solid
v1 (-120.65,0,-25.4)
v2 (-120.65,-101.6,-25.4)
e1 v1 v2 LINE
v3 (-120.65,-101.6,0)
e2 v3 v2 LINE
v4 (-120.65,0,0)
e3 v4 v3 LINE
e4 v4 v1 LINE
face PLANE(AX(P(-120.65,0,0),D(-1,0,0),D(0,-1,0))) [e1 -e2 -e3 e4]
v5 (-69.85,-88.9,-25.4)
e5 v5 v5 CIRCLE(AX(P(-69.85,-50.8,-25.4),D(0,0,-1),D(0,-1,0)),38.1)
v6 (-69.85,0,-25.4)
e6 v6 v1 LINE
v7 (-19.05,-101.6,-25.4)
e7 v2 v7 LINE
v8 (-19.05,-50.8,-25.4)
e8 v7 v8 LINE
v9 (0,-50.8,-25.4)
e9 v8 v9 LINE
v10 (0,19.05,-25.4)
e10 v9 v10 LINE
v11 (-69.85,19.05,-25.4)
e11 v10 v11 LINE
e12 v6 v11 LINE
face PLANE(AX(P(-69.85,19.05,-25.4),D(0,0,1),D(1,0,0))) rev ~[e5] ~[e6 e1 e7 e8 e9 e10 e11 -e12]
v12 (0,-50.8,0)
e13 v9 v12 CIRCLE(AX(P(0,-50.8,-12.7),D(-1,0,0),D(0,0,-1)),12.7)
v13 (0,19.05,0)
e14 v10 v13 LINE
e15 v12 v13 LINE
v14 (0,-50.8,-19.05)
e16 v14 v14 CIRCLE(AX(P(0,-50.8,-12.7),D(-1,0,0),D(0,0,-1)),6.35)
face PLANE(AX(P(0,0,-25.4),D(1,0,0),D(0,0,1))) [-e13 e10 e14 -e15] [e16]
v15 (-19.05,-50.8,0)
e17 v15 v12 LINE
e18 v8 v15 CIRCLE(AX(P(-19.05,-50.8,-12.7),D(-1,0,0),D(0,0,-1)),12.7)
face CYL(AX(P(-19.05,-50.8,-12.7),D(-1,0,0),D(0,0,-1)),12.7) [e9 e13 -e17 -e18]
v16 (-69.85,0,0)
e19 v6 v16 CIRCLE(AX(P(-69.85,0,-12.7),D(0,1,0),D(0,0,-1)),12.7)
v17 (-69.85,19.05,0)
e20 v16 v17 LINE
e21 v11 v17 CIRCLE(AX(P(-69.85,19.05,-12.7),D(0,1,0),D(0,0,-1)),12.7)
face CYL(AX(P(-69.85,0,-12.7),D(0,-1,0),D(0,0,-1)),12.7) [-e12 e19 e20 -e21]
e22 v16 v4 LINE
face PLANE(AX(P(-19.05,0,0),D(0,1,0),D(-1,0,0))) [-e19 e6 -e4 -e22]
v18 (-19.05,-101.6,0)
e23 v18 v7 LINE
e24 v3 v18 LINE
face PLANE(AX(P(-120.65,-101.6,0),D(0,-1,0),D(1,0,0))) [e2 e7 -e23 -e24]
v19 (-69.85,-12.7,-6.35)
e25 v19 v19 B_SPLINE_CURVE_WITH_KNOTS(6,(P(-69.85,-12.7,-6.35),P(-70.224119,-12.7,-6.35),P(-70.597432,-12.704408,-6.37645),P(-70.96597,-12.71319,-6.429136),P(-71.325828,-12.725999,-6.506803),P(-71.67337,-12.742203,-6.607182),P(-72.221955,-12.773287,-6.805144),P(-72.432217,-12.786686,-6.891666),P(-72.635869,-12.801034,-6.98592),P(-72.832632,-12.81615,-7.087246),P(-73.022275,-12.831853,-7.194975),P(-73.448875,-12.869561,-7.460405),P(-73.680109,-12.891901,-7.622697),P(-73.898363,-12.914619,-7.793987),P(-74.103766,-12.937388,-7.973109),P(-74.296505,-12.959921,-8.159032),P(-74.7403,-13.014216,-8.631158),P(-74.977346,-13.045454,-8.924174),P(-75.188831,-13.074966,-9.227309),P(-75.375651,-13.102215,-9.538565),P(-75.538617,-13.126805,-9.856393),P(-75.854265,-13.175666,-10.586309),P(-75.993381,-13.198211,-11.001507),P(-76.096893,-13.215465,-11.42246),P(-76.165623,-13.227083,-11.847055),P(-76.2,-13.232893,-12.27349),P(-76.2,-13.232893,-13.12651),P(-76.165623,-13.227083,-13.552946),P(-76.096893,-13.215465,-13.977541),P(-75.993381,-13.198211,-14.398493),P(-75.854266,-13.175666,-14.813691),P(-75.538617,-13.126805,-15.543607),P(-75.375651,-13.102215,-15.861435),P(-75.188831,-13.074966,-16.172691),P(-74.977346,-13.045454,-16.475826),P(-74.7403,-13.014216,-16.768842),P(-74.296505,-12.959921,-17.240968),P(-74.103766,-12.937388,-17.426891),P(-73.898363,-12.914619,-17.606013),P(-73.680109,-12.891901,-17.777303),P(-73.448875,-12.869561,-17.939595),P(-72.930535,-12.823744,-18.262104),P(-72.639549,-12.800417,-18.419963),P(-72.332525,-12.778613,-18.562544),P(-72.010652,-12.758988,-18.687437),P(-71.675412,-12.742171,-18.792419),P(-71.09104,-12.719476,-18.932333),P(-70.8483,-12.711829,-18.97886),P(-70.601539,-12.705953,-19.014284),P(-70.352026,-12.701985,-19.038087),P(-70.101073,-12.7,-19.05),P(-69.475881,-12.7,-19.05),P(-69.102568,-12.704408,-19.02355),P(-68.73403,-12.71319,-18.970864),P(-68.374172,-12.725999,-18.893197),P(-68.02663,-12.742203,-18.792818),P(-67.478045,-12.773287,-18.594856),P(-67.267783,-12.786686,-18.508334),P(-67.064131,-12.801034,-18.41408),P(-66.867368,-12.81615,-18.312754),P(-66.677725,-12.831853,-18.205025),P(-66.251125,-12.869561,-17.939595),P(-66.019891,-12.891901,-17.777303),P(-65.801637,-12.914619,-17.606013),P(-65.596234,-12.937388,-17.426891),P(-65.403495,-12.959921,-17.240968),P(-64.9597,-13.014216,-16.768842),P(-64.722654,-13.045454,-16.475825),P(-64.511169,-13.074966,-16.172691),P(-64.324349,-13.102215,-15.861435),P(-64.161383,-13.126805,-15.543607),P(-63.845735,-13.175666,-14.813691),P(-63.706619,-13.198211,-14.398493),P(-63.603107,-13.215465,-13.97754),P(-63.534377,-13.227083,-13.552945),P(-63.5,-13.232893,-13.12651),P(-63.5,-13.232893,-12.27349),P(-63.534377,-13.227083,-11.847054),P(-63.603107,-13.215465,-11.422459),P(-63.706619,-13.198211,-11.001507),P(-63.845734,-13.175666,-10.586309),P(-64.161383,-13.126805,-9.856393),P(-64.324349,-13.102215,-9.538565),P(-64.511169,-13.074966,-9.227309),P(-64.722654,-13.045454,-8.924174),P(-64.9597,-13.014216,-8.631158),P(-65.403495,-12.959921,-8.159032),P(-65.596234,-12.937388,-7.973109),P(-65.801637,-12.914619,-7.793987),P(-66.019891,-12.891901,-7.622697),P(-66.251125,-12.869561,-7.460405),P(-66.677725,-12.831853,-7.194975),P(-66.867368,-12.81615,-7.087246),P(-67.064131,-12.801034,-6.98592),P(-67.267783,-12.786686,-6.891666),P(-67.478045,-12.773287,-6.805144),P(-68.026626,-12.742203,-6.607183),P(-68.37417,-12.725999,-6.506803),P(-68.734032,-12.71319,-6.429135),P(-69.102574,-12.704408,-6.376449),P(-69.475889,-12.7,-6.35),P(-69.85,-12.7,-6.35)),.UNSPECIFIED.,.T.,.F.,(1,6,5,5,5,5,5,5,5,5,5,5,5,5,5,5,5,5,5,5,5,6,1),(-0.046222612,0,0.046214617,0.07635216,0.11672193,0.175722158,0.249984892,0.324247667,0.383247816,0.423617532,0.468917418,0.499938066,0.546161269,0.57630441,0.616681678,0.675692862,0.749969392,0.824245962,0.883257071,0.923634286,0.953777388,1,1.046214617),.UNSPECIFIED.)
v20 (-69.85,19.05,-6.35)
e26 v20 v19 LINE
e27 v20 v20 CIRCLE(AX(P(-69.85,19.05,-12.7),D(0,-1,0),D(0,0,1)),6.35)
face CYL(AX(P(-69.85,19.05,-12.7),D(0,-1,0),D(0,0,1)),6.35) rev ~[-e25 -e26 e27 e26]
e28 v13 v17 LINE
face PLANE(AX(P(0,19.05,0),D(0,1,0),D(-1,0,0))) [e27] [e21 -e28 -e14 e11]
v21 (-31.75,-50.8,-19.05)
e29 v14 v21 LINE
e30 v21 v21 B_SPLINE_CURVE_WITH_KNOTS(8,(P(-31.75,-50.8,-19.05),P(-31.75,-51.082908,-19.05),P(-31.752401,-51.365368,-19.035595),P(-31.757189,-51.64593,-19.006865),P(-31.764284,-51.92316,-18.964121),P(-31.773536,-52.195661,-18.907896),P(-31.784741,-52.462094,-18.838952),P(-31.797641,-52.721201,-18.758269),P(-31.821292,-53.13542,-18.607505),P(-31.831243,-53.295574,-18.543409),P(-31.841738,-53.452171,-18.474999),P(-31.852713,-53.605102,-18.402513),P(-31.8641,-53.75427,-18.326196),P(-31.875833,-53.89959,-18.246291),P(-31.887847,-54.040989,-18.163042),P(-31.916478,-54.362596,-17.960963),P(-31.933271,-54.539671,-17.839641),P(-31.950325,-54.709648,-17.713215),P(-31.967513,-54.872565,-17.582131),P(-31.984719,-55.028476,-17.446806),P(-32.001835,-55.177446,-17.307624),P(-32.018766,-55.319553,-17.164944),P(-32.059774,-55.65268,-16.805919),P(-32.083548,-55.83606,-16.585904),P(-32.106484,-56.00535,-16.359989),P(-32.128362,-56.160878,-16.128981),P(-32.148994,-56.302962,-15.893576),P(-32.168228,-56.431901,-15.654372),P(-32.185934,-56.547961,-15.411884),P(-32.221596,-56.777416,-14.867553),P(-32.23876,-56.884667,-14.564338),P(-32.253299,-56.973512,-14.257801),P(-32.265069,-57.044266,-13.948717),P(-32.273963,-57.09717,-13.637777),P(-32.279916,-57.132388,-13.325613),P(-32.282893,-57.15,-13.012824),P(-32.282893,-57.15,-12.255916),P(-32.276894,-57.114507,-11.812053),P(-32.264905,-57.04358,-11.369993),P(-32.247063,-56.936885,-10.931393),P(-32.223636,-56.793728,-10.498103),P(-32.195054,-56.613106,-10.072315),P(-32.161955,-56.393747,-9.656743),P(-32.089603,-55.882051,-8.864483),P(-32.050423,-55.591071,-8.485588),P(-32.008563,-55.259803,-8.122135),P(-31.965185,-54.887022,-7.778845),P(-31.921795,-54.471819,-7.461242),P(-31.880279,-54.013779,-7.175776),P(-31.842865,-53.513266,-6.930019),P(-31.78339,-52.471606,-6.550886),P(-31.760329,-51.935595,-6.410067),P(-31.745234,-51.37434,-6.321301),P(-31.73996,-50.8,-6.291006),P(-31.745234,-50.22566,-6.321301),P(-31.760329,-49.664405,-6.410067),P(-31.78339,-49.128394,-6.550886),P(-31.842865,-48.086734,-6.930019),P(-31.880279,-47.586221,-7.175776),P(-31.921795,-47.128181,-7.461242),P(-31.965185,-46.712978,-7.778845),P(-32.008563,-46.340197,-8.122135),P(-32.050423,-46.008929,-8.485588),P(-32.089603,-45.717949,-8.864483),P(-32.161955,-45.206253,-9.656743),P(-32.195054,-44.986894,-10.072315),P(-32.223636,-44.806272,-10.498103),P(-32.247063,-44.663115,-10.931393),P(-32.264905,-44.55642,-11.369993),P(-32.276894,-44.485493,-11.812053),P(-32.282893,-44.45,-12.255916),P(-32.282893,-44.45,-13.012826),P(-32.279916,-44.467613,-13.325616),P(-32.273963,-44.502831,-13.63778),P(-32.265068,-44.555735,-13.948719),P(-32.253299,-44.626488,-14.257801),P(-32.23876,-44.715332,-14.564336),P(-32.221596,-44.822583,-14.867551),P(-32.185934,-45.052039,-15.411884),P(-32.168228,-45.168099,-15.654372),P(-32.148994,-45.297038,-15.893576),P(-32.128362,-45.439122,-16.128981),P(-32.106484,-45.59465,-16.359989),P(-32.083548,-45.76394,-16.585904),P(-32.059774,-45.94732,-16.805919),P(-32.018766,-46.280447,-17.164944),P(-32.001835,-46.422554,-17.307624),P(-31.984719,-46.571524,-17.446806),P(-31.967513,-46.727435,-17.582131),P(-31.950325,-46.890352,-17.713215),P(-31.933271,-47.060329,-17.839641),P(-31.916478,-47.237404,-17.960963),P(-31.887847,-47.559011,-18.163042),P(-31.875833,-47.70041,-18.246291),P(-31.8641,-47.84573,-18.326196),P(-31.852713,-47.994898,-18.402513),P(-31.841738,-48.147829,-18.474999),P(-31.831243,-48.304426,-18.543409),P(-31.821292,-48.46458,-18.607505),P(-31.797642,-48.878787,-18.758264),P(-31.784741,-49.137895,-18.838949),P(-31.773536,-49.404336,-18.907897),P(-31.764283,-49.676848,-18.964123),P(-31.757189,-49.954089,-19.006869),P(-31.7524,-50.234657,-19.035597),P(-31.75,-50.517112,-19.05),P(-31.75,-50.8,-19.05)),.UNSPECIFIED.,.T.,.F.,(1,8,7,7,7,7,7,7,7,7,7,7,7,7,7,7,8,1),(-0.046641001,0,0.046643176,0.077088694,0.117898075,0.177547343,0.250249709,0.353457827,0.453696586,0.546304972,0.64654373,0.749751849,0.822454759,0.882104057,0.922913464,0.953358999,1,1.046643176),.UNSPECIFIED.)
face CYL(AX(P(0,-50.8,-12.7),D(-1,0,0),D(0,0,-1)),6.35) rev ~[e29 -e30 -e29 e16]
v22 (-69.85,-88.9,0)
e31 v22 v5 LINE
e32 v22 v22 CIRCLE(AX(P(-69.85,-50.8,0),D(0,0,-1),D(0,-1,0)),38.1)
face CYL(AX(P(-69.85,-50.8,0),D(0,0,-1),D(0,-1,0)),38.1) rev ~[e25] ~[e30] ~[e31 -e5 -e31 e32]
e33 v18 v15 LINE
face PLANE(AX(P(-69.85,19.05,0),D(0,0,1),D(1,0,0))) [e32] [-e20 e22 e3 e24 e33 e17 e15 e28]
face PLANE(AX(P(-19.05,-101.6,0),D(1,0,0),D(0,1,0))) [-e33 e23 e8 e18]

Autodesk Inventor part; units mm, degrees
ref_plane "YZ Plane" through (0, 0, 0) normal (1, 0, 0) x (0, 1, 0)
ref_plane "XZ Plane" through (0, 0, 0) normal (0, 1, 0) x (-1, 0, 0)
ref_plane "XY Plane" through (0, 0, 0) normal (0, 0, 1) x (1, 0, 0)
sketch "Sketch2" plane through (0, 0, 0) normal (0, 1, 0) x (-1, 0, 0)
  line L0 (0, 0) -> (69.85, 0)
  line L1 (69.85, 0) -> (69.85, -25.4) construction
  line L2 (69.85, -25.4) -> (0, -25.4)
  line L3 (0, -25.4) -> (0, 0)
  arc A0 (69.85, -25.4) -> (69.85, 0) centre (69.85, -12.7) ccw
  dimension "d0" = 25.4
  dimension "d1" = 69.85
extrude "Extrusion1" add sketch "Sketch2" along normal blind 19.05
ref_plane "Work Plane1" through (0, 19.05, 0) normal (0.7071068, -0.7071068, 0) x (0, 0, -1)
mirror "Mirror1" about plane through (0, 19.05, 0) normal (0.7071068, -0.7071068, 0) of "Extrusion1"
sketch "Sketch3" plane through (-69.85, 19.05, 0) normal (0, 0, 1) x (1, 0, 0)
  line L0 (50.8, -69.85) -> (50.8, -19.05) projected
  line L1 (-50.8, -120.65) -> (50.8, -120.65)
  line L2 (50.8, -120.65) -> (50.8, -19.05)
  line L3 (50.8, -19.05) -> (-50.8, -19.05)
  line L4 (-50.8, -19.05) -> (-50.8, -120.65)
  line L5 (-50.8, -120.65) -> (50.8, -19.05) construction
  line L6 (50.8, -120.65) -> (-50.8, -19.05) construction
  point P0 (0, -69.85)
  point P1 (0, -69.85)
  dimension "d6" = 101.6
extrude "Extrusion2" add sketch "Sketch3" against normal up to surface (25.4 mm away)
hole "Hole1" at (-69.85, -50.8, 0) direction (0, 0, -1) diameter 76.2 end through all
sketch "Sketch4" plane through (0, 19.05, 0) normal (1, 0, 0) x (0, 0, -1)
  arc A0 (0, -69.85) -> (25.4, -69.85) centre (12.7, -69.85) ccw projected
  point P0 (0, -19.05)
hole "Hole2" at (0, -50.8, -12.7) direction (-1, 0, 0) diameter 12.7 end up to surface
sketch "Sketch5" plane through (0, 19.05, 0) normal (0, 1, 0) x (1, 0, 0)
  arc A0 (-69.85, 25.4) -> (-69.85, 0) centre (-69.85, 12.7) ccw projected
  point P0 (0, 0)
hole "Hole3" at (-69.85, 19.05, -12.7) direction (0, -1, 0) diameter 12.7 end up to surface
properties part number "PivotHolder"
